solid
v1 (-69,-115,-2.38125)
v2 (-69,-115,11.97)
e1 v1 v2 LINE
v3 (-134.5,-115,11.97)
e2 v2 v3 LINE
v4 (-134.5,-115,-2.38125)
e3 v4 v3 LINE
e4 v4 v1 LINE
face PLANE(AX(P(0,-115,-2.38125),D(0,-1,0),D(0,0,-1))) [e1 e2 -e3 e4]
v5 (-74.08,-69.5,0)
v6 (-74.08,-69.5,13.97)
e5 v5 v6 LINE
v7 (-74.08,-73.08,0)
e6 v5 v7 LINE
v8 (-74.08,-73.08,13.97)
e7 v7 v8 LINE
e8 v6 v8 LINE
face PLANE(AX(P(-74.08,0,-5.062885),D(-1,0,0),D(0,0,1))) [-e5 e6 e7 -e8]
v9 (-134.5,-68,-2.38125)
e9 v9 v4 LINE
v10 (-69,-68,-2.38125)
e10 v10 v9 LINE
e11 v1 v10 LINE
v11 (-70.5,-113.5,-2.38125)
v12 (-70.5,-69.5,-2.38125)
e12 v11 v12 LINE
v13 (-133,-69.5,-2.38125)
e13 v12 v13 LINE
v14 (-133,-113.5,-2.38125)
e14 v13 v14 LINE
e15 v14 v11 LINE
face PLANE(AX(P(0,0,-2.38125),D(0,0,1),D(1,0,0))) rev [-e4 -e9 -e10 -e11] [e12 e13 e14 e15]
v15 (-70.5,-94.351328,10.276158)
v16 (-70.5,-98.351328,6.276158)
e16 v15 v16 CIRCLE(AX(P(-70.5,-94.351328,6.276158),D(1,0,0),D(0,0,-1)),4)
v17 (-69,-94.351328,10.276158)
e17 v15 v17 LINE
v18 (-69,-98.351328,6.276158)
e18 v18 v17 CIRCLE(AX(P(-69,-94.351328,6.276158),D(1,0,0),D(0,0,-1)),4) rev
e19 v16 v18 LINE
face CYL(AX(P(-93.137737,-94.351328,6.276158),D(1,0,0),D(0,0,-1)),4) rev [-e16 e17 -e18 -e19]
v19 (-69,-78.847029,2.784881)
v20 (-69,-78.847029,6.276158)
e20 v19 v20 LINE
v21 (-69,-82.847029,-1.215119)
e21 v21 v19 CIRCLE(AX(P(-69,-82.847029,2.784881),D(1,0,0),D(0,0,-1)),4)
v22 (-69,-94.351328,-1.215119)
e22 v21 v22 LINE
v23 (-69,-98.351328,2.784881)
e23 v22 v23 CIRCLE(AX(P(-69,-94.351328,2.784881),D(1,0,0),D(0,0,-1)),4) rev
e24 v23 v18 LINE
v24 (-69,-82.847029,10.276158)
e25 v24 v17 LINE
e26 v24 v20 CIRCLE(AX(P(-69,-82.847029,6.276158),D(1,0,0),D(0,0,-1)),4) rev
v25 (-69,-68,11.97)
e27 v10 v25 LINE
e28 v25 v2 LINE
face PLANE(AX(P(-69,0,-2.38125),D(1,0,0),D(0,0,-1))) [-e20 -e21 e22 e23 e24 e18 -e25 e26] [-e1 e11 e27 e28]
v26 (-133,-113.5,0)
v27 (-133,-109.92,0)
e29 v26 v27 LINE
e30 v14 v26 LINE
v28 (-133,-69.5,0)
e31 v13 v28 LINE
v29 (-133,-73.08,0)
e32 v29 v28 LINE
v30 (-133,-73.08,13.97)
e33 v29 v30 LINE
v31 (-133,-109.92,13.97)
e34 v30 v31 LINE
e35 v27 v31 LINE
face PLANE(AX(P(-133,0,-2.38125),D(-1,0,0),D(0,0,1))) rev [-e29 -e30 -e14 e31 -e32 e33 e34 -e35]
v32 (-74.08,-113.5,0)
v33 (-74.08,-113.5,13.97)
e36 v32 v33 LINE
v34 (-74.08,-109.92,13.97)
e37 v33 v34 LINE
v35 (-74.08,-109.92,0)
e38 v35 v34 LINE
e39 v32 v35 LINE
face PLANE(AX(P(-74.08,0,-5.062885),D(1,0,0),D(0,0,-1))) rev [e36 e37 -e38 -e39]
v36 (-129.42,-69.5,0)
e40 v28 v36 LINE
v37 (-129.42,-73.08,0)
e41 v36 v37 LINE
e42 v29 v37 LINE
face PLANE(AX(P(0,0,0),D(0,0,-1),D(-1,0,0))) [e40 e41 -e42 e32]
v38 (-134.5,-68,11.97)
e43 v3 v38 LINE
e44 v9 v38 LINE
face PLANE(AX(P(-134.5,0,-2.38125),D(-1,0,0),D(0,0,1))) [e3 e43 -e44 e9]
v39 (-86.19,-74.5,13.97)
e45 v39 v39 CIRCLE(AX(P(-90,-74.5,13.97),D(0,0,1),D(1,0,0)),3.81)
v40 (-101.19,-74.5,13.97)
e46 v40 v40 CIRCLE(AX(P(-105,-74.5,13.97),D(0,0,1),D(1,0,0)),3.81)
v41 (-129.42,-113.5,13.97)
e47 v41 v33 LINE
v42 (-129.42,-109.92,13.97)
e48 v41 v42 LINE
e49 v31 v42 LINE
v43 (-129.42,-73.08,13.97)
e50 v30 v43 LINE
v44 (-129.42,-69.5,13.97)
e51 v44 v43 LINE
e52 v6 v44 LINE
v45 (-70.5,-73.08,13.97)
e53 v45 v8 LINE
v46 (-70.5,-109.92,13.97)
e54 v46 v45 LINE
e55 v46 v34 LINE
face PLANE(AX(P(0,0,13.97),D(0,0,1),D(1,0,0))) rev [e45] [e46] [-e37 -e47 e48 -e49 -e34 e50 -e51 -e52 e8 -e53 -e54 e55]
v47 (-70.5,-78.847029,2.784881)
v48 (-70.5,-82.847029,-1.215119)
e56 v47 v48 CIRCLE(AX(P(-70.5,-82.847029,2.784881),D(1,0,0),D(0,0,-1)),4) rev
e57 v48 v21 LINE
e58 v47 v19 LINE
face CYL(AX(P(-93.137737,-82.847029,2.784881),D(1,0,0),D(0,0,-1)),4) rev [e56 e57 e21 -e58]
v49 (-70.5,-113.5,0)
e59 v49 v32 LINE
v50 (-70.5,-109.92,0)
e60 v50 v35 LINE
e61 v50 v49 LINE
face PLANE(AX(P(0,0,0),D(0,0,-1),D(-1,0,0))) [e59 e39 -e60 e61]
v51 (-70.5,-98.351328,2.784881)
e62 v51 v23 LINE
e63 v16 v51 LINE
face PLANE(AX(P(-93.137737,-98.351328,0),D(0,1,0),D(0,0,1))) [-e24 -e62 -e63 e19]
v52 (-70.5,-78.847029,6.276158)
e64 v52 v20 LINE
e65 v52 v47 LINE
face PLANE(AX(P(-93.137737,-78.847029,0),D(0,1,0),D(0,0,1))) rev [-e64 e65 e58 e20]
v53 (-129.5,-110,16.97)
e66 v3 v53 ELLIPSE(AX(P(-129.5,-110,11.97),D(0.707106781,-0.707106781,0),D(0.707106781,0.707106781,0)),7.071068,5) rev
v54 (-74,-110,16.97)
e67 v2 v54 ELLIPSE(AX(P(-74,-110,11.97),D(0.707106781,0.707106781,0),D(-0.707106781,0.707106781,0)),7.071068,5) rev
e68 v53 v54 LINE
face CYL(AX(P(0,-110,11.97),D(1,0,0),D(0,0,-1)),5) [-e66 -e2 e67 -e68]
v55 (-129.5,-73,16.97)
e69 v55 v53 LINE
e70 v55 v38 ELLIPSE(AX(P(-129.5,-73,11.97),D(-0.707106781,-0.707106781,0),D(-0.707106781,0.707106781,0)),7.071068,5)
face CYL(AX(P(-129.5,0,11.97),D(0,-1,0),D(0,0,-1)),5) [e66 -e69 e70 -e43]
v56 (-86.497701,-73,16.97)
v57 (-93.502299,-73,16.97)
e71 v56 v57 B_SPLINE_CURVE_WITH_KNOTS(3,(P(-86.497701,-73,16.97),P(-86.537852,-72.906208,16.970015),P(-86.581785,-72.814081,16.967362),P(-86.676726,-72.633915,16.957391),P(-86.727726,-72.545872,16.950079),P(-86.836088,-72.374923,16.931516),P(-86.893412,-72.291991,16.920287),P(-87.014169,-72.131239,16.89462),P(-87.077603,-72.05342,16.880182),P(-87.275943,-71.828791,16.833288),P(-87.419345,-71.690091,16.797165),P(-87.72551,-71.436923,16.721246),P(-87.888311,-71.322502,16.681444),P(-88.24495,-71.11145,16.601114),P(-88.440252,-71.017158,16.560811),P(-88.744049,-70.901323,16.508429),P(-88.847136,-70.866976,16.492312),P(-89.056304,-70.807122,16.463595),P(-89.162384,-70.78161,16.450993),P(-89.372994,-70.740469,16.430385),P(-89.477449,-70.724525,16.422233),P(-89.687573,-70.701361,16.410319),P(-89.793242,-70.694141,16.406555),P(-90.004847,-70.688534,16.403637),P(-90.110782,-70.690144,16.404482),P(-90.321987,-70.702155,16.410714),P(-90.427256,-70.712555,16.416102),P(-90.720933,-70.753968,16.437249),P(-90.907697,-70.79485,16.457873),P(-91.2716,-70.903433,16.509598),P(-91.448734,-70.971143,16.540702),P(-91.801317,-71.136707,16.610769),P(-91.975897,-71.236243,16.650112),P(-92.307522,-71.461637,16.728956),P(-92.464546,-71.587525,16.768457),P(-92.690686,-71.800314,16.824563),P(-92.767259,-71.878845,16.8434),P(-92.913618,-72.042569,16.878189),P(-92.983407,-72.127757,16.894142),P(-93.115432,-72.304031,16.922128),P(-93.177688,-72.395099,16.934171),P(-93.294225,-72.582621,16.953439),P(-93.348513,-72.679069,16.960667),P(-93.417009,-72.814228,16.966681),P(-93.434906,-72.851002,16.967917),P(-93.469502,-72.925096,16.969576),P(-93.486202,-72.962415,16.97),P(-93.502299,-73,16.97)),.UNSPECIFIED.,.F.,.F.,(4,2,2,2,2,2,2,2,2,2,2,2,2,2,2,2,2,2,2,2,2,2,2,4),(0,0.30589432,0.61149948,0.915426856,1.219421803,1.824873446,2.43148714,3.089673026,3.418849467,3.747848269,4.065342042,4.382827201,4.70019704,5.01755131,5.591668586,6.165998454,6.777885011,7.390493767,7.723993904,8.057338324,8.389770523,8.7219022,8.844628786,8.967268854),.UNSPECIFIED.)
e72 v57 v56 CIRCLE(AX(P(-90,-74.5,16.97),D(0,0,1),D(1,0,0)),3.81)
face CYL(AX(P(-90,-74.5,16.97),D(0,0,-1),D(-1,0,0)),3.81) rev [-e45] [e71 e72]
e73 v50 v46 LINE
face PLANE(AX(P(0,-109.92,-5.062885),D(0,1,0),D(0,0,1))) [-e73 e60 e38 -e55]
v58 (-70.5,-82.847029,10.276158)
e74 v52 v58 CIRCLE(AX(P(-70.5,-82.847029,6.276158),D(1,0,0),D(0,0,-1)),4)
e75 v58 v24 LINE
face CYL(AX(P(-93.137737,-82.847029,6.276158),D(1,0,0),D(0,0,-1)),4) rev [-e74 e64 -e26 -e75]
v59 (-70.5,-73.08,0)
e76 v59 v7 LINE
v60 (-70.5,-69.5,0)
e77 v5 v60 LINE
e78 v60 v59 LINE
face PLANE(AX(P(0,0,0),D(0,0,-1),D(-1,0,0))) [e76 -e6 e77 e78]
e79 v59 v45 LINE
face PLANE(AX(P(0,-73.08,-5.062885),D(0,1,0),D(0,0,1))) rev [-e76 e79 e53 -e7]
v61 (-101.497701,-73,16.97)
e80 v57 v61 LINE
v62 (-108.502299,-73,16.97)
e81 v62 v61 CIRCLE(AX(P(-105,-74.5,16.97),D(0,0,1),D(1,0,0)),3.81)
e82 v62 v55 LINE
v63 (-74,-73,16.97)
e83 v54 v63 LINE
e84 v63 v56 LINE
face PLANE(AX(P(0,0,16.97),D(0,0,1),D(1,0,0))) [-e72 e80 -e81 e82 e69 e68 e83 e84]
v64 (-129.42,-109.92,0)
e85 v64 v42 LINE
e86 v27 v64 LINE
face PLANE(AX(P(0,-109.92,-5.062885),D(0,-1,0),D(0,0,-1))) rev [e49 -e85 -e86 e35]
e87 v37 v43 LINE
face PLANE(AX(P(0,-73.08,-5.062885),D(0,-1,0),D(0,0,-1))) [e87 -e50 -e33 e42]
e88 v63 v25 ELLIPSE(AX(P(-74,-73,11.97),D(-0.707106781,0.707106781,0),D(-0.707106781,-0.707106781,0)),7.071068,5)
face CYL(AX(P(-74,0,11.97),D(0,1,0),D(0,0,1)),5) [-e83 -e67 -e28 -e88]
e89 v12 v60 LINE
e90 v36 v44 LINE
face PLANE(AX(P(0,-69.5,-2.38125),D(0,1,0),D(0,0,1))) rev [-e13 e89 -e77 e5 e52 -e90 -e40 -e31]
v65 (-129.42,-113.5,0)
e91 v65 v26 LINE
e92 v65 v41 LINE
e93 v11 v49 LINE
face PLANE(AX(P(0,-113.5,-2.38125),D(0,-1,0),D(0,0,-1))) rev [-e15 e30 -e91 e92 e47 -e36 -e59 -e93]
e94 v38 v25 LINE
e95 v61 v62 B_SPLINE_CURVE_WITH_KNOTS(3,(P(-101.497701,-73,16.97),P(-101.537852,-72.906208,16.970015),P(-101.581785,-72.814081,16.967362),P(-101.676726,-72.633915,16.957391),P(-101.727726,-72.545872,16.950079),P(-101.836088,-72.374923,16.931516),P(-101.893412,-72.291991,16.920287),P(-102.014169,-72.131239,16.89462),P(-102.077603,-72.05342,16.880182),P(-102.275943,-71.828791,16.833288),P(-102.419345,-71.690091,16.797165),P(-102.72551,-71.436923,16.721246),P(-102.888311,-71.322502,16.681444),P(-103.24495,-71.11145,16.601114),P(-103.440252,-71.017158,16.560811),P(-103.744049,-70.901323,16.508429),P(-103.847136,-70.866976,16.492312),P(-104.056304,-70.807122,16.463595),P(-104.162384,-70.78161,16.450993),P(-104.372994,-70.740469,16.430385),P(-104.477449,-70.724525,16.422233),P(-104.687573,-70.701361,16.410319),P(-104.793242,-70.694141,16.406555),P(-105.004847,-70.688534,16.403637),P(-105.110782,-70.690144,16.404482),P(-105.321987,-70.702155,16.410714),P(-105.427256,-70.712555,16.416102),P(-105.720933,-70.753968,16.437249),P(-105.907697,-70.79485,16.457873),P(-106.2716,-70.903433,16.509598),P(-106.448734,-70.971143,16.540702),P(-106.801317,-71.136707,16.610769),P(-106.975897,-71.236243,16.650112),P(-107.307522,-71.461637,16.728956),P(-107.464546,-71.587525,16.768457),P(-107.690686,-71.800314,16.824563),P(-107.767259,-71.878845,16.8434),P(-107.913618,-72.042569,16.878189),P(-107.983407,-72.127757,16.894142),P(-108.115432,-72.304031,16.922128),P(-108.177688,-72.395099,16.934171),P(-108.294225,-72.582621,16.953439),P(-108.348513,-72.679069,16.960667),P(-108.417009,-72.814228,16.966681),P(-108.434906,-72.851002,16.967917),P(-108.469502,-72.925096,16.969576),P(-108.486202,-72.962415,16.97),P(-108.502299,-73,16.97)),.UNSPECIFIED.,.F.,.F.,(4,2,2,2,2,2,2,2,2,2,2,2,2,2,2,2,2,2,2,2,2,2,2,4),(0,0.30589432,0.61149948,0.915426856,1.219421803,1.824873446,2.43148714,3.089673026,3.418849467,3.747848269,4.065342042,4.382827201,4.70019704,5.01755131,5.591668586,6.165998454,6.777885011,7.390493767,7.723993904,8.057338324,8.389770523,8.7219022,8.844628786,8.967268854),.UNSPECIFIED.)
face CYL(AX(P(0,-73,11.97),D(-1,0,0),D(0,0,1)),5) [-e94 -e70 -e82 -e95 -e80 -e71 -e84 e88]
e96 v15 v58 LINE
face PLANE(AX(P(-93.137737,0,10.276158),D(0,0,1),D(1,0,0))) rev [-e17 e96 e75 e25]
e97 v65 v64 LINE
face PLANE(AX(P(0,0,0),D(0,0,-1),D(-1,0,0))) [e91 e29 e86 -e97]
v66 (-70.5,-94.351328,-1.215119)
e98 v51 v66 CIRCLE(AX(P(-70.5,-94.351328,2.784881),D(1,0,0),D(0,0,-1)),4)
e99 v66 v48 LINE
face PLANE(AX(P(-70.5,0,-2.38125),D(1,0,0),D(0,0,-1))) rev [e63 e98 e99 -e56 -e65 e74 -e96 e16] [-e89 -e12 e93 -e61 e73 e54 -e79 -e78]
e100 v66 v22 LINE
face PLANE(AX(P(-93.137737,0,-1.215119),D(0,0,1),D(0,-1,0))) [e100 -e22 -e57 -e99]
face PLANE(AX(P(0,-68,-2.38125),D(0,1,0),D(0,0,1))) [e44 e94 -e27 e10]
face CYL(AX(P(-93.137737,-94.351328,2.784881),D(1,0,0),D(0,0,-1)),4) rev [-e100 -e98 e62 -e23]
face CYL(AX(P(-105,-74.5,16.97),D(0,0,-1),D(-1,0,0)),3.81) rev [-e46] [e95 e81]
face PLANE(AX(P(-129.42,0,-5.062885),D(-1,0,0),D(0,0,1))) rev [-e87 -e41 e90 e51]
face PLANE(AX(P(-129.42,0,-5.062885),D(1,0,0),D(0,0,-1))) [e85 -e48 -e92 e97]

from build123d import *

# Parameters (mm, degrees)
BOSS_EXTRUDE1_DEPTH      = 13.97
BOSS_EXTRUDE1_DEPTH_BACK = 2.38125
SKETCH1_W                = 65.5
SKETCH1_H                = 47
SKETCH1_W_2              = 62.5
SKETCH1_H_2              = 44
SKETCH2_W                = 3.58
SKETCH2_H                = 3.58
BOSS_EXTRUDE2_DEPTH      = 13.97
SKETCH3_W                = 65.5
SKETCH3_H                = 47
SKETCH3_R                = 3.81
BOSS_EXTRUDE3_DEPTH      = 3
FILLET1_R                = 5
CUT_EXTRUDE1_DEPTH       = 1.5


with BuildPart() as part:
    # Sketch1 → Boss-Extrude1 (new, two sides: drawn at the far end of the back side and taken through both)
    with BuildSketch(Plane.XY.offset(-BOSS_EXTRUDE1_DEPTH_BACK)):
        with Locations((-101.75, -91.5)):
            Rectangle(SKETCH1_W, SKETCH1_H)
        with Locations((-101.75, -91.5)):
            Rectangle(SKETCH1_W_2, SKETCH1_H_2, mode=Mode.SUBTRACT)
    extrude(amount=BOSS_EXTRUDE1_DEPTH + BOSS_EXTRUDE1_DEPTH_BACK)

    # Sketch2 → Boss-Extrude2 (add)
    with BuildSketch(Plane.XY.offset(13.97)):
        with Locations((-131.21, -71.29)):
            Rectangle(SKETCH2_W, SKETCH2_H)
        with Locations((-131.21, -111.71)):
            Rectangle(SKETCH2_W, SKETCH2_H)
        with Locations((-72.29, -111.71)):
            Rectangle(SKETCH2_W, SKETCH2_H)
        with Locations((-72.29, -71.29)):
            Rectangle(SKETCH2_W, SKETCH2_H)
    extrude(amount=-BOSS_EXTRUDE2_DEPTH)

    # Sketch3 → Boss-Extrude3 (add)
    with BuildSketch(Plane.XY.offset(13.97)):
        with Locations((-101.75, -91.5)):
            Rectangle(SKETCH3_W, SKETCH3_H)
        with Locations((-105, -74.5)):
            Circle(SKETCH3_R, mode=Mode.SUBTRACT)
        with Locations((-90, -74.5)):
            Circle(SKETCH3_R, mode=Mode.SUBTRACT)
    extrude(amount=BOSS_EXTRUDE3_DEPTH)

    # Fillet1
    # the kernel refuses this fillet: 5 mm, written as the material it takes off along each edge
    with BuildSketch(Plane(origin=(-56.5, -68, 16.97), x_dir=(0, -1, 0), z_dir=(-1, 0, 0))) as fillet1_piece_1:
        with BuildLine():
            CenterArc((FILLET1_R, -FILLET1_R), FILLET1_R, 90, 90)
            Line((0, -FILLET1_R), (0, 0))
            Line((0, 0), (FILLET1_R, 0))
        make_face()
    extrude(amount=90.5, mode=Mode.SUBTRACT)
    with BuildSketch(Plane(origin=(-134.5, -55.5, 16.97), x_dir=(0, 0, -1), z_dir=(0, -1, 0)), Plane(origin=(-69, -127.5, 16.97), x_dir=(0, 0, -1), z_dir=(0, 1, 0))) as fillet1_piece_2:
        with BuildLine():
            CenterArc((FILLET1_R, FILLET1_R), FILLET1_R, 180, 90)
            Line((0, FILLET1_R), (0, 0))
            Line((0, 0), (FILLET1_R, 0))
        make_face()
    extrude(amount=72, mode=Mode.SUBTRACT)
    with BuildSketch(Plane(origin=(-147, -115, 16.97), x_dir=(0, 0, -1), z_dir=(1, 0, 0))) as fillet1_piece_3:
        with BuildLine():
            CenterArc((FILLET1_R, FILLET1_R), FILLET1_R, 180, 90)
            Line((0, FILLET1_R), (0, 0))
            Line((0, 0), (FILLET1_R, 0))
        make_face()
    extrude(amount=90.5, mode=Mode.SUBTRACT)

    # Sketch4 → Cut-Extrude1 (cut)
    with BuildSketch(Plane(origin=(-69, 0, 0), x_dir=(0, 0, -1), z_dir=(1, 0, 0))):
        with BuildLine():
            ThreePointArc((-10.276157649, -82.847028828), (-9.104584774, -80.018601703), (-6.276157649, -78.847028828))
            Line((-6.276157649, -78.847028828), (-2.784881052, -78.847028828))
            ThreePointArc((-2.784881052, -78.847028828), (0.043546073, -80.018601703), (1.215118948, -82.847028828))
            Line((1.215118948, -82.847028828), (1.215118948, -94.351328143))
            ThreePointArc((1.215118948, -94.351328143), (0.043546073, -97.179755268), (-2.784881052, -98.351328143))
            Line((-2.784881052, -98.351328143), (-6.276157649, -98.351328143))
            ThreePointArc((-6.276157649, -98.351328143), (-9.104584774, -97.179755268), (-10.276157649, -94.351328143))
            Line((-10.276157649, -94.351328143), (-10.276157649, -82.847028828))
        make_face()
    extrude(amount=-CUT_EXTRUDE1_DEPTH, mode=Mode.SUBTRACT)


solid = part.part
